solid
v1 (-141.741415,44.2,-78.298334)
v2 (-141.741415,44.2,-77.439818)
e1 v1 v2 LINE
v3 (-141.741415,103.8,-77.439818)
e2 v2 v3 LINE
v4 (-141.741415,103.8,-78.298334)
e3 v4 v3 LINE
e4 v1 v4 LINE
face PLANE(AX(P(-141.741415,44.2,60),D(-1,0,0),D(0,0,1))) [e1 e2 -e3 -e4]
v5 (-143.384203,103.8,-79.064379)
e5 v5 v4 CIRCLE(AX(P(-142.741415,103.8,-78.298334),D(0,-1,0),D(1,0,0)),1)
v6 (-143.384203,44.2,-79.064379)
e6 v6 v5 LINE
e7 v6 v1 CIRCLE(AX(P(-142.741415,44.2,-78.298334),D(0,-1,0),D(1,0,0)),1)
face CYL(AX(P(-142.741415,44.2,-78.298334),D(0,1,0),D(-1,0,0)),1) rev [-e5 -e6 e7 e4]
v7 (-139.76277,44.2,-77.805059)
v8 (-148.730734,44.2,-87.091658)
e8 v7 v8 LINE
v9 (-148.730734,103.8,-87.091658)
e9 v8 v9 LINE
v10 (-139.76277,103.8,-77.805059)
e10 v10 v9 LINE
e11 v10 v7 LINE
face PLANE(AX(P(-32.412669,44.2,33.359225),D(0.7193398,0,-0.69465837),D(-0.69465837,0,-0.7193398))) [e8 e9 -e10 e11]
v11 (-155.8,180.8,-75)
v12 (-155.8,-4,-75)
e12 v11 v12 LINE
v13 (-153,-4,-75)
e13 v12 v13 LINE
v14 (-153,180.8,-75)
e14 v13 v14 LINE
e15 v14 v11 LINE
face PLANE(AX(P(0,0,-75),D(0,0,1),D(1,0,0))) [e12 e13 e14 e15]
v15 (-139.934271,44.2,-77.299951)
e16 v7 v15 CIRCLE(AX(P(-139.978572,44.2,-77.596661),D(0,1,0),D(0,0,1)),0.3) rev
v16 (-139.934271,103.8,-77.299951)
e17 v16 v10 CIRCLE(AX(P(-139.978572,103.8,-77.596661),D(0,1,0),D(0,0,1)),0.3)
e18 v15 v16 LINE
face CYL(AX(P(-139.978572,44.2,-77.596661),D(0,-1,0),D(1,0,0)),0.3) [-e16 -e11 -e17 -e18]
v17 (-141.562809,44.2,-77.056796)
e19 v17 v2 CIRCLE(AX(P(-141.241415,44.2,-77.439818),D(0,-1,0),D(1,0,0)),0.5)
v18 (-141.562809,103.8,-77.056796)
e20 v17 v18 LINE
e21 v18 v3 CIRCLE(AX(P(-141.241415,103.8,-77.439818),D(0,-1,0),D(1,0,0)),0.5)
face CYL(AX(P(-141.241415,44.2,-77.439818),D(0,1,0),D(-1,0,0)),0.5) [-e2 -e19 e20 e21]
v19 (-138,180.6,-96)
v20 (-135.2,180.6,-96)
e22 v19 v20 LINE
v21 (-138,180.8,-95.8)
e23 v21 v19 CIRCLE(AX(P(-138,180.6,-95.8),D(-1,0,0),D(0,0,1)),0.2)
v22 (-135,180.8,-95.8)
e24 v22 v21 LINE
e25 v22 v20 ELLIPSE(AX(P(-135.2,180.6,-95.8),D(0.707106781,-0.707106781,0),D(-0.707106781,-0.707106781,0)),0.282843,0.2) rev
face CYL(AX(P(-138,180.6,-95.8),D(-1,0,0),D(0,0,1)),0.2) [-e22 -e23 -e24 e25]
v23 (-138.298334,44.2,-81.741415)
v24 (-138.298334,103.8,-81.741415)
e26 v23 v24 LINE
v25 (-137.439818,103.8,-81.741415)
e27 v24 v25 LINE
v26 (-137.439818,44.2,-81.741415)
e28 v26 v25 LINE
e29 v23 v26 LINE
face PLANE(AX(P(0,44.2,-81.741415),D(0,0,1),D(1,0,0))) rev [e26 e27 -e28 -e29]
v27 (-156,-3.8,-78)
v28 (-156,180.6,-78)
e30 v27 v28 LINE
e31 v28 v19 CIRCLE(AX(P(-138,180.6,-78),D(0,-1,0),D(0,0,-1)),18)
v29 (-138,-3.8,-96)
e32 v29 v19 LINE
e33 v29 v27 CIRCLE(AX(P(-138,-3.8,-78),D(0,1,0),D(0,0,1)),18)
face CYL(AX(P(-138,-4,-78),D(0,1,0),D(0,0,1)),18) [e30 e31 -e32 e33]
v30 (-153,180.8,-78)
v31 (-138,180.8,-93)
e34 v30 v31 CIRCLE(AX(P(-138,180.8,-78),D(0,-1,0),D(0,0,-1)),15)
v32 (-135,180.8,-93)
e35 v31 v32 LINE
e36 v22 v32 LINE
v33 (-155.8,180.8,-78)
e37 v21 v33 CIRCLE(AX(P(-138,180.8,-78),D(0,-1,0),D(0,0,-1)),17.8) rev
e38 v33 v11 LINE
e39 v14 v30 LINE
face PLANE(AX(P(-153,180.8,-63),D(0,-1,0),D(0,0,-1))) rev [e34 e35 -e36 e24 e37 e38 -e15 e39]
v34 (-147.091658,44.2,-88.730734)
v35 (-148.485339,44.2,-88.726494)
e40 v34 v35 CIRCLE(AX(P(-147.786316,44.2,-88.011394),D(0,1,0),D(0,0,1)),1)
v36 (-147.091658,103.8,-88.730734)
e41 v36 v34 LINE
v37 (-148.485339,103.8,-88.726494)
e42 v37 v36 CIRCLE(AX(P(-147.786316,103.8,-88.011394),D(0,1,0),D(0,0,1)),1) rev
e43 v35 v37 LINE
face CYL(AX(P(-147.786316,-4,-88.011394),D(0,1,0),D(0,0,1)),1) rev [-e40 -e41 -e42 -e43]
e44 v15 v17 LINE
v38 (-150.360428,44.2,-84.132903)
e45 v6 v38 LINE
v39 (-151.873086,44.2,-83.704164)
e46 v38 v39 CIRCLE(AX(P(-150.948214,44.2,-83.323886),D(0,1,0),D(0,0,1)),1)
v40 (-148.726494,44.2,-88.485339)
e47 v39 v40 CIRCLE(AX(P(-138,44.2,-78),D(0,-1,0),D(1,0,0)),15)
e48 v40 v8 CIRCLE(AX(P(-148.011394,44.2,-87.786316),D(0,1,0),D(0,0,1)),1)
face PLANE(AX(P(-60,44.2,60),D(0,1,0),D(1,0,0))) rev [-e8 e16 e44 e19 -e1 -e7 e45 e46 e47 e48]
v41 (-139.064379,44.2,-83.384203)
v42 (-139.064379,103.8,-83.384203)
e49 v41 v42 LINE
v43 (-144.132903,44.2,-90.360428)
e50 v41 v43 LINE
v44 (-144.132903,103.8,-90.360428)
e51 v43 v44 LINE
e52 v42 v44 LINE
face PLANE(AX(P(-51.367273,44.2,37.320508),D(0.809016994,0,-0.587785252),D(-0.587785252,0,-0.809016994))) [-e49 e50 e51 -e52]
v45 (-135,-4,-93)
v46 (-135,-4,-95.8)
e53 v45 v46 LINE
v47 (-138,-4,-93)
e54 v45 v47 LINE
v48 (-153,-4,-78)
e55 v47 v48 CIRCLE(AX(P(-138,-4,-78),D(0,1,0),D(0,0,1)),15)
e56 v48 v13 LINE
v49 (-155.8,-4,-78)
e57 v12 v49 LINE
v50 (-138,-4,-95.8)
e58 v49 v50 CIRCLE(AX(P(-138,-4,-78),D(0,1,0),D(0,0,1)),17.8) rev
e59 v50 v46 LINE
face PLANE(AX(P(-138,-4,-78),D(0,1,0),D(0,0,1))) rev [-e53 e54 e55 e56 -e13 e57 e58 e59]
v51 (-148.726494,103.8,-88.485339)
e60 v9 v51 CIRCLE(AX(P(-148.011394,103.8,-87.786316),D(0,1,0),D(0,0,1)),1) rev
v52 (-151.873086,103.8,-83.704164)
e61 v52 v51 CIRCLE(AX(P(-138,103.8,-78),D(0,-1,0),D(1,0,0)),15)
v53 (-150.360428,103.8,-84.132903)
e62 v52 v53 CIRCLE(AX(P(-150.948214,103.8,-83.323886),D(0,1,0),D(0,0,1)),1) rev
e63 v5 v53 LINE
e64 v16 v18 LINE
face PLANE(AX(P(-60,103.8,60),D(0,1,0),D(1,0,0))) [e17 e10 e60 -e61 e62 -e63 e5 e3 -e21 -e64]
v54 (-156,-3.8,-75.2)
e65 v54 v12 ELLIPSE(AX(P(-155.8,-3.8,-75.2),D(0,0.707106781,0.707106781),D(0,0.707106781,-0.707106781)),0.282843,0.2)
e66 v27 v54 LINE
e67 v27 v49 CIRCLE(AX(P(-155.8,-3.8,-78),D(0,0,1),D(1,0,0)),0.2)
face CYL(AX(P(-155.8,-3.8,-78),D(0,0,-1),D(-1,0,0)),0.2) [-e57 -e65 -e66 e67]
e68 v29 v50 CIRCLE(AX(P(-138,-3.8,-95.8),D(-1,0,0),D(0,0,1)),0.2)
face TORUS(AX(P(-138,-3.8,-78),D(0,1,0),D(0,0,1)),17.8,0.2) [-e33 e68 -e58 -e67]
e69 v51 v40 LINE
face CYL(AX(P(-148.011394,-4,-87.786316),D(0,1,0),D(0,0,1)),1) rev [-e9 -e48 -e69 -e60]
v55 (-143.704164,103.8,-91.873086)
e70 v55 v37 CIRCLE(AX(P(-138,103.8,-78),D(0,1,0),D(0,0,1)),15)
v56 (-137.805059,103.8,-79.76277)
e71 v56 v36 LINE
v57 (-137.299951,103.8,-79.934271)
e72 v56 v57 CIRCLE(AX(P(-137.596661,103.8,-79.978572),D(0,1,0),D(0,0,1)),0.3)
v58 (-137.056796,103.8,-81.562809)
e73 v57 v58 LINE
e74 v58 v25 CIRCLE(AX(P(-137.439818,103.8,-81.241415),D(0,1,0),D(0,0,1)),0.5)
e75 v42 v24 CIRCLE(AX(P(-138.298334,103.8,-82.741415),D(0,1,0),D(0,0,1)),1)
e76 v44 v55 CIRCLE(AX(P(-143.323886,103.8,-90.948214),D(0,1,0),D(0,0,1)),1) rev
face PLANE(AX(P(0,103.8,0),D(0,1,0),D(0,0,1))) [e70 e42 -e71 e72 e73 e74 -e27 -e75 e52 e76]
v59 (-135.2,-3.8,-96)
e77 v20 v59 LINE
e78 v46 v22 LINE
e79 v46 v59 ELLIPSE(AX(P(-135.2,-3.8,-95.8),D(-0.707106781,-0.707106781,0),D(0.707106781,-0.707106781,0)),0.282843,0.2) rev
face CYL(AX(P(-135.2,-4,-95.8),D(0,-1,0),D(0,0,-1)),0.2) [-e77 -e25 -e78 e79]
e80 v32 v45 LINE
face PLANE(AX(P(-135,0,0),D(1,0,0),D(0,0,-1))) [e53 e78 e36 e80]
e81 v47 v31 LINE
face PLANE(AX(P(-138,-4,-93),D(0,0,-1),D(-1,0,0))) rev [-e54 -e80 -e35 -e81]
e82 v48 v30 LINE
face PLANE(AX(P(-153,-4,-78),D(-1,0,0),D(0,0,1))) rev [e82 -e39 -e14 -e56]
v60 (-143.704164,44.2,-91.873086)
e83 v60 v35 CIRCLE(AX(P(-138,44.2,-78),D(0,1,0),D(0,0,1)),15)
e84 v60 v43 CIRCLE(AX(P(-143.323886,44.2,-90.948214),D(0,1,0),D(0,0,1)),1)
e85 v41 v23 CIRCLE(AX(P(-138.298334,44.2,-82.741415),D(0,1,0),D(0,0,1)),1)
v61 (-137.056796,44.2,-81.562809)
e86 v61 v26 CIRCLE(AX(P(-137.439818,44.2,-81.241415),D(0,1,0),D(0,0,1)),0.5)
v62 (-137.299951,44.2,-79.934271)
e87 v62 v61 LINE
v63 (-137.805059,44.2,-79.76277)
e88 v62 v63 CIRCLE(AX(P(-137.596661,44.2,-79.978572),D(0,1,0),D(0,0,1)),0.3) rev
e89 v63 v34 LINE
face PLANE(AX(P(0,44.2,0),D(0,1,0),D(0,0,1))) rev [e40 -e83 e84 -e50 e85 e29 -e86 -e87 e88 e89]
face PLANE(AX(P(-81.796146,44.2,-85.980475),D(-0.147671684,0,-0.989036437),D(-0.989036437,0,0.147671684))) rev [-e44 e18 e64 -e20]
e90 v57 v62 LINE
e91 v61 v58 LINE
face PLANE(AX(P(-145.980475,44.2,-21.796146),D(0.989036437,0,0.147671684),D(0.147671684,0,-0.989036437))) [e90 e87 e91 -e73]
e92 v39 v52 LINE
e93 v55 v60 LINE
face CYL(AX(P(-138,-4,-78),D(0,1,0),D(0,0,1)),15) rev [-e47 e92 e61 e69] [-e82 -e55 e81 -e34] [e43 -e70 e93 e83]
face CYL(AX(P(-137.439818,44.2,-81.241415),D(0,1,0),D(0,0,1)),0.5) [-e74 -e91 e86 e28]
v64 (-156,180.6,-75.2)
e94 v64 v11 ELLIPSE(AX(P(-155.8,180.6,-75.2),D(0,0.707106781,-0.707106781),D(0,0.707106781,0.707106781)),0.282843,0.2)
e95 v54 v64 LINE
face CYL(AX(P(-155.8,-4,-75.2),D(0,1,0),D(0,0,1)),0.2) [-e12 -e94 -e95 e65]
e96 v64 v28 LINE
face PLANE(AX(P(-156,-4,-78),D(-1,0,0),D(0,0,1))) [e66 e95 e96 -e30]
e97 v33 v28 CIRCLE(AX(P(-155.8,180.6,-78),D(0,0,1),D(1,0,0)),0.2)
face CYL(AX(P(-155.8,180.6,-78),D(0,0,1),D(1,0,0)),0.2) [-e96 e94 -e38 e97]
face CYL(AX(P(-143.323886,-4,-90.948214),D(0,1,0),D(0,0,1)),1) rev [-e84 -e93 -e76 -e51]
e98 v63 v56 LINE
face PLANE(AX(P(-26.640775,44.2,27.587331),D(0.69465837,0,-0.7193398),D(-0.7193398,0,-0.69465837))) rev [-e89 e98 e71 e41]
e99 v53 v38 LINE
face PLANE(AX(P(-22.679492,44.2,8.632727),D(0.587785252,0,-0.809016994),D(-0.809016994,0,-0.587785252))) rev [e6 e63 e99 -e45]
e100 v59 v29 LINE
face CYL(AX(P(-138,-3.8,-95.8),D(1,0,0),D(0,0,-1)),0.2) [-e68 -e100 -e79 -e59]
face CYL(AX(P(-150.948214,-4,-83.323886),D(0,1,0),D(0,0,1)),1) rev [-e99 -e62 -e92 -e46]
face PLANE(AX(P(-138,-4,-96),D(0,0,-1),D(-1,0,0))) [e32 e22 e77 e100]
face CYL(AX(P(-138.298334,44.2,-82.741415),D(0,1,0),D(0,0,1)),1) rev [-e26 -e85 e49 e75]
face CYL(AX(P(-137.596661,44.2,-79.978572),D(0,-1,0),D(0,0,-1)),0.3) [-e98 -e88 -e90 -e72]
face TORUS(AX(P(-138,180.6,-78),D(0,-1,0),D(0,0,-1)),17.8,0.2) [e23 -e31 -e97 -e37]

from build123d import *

# Parameters (mm, degrees)
STOCK_OUTTER_CASE_1_START = -4
STOCK_OUTTER_CASE_1_DEPTH = 184.8
FILLET1_R                 = 0.2
BOSS_EXTRUDE4_DEPTH       = 29.8
FILLET3_R                 = 0.3
FILLET4_R                 = 1


# Read off the part's stored shape, not the designer's step: Stock-outter_case-1
with BuildPart() as part:
    # Stock-outter_case-1 outline → Stock-outter_case-1 (new body)
    with BuildSketch(Plane(origin=(0, 0, 0), x_dir=(1, 0, 0), z_dir=(0, 1, 0)).offset(STOCK_OUTTER_CASE_1_START)):
        with BuildLine():
            Line((-138, 93), (-135, 93))
            Line((-135, 93), (-135, 96))
            Line((-135, 96), (-138, 96))
            ThreePointArc((-138, 96), (-150.727922061, 90.727922061), (-156, 78))
            Line((-156, 78), (-156, 75))
            Line((-156, 75), (-153, 75))
            Line((-153, 75), (-153, 78))
            ThreePointArc((-153, 78), (-148.606601718, 88.606601718), (-138, 93))
        make_face()
    extrude(amount=STOCK_OUTTER_CASE_1_DEPTH)

    # Fillet1
    fillet1_edges = [part.edges().sort_by_distance(p)[0] for p in [
        (-150.727922061, 180.8, -90.727922061),
        (-156, 180.8, -76.5),
        (-136.5, 180.8, -96),
        (-150.727922061, -4, -90.727922061),
        (-156, -4, -76.5),
        (-136.5, -4, -96),
        (-156, 88.4, -75),
        (-135, 88.4, -96),
    ]]
    fillet(fillet1_edges, radius=FILLET1_R)

    # Sketch5 → Boss-Extrude4 (add, symmetric)
    with BuildSketch(Plane(origin=(0, 74, 0), x_dir=(1, 0, 0), z_dir=(0, 1, 0))):
        with BuildLine():
            Line((-137.385981926, 79.358072098), (-137.056795696, 81.56280876))
            ThreePointArc((-137.056795696, 81.56280876), (-137.228508787, 81.694568849), (-137.439817918, 81.741414955))
            Line((-137.439817918, 81.741414955), (-138.298334245, 81.741414955))
            ThreePointArc((-138.298334245, 81.741414955), (-139.204642032, 82.318796694), (-139.064378688, 83.384202565))
            Line((-139.064378688, 83.384202565), (-144.848487028, 91.34534471))
            ThreePointArc((-144.848487028, 91.34534471), (-146.365861195, 90.450396237), (-147.767847562, 89.383723205))
            Line((-147.767847562, 89.383723205), (-137.385981926, 79.358072098))
        make_face()
    boss_extrude4 = extrude(amount=BOSS_EXTRUDE4_DEPTH, both=True)

    # Mirror2: Boss-Extrude4 across plane
    add(boss_extrude4.mirror(Plane(origin=(-30, 0, 30), x_dir=(0.7071067811865478, 0, 0.7071067811865472), z_dir=(0.7071067811865475, 0, -0.7071067811865477))))

    # Fillet3
    fillet3_edges = [part.edges().sort_by_distance(p)[0] for p in [
        (-137.385981926, 74, -79.358072098),
        (-139.358072098, 74, -77.385981926),
    ]]
    fillet(fillet3_edges, radius=FILLET3_R)

    # Fillet4
    fillet4_edges = [part.edges().sort_by_distance(p)[0] for p in [
        (-147.767847562, 74, -89.383723205),
        (-144.848487028, 74, -91.34534471),
        (-151.34534471, 74, -84.848487028),
        (-149.383723205, 74, -87.767847562),
    ]]
    fillet(fillet4_edges, radius=FILLET4_R)


solid = part.part
